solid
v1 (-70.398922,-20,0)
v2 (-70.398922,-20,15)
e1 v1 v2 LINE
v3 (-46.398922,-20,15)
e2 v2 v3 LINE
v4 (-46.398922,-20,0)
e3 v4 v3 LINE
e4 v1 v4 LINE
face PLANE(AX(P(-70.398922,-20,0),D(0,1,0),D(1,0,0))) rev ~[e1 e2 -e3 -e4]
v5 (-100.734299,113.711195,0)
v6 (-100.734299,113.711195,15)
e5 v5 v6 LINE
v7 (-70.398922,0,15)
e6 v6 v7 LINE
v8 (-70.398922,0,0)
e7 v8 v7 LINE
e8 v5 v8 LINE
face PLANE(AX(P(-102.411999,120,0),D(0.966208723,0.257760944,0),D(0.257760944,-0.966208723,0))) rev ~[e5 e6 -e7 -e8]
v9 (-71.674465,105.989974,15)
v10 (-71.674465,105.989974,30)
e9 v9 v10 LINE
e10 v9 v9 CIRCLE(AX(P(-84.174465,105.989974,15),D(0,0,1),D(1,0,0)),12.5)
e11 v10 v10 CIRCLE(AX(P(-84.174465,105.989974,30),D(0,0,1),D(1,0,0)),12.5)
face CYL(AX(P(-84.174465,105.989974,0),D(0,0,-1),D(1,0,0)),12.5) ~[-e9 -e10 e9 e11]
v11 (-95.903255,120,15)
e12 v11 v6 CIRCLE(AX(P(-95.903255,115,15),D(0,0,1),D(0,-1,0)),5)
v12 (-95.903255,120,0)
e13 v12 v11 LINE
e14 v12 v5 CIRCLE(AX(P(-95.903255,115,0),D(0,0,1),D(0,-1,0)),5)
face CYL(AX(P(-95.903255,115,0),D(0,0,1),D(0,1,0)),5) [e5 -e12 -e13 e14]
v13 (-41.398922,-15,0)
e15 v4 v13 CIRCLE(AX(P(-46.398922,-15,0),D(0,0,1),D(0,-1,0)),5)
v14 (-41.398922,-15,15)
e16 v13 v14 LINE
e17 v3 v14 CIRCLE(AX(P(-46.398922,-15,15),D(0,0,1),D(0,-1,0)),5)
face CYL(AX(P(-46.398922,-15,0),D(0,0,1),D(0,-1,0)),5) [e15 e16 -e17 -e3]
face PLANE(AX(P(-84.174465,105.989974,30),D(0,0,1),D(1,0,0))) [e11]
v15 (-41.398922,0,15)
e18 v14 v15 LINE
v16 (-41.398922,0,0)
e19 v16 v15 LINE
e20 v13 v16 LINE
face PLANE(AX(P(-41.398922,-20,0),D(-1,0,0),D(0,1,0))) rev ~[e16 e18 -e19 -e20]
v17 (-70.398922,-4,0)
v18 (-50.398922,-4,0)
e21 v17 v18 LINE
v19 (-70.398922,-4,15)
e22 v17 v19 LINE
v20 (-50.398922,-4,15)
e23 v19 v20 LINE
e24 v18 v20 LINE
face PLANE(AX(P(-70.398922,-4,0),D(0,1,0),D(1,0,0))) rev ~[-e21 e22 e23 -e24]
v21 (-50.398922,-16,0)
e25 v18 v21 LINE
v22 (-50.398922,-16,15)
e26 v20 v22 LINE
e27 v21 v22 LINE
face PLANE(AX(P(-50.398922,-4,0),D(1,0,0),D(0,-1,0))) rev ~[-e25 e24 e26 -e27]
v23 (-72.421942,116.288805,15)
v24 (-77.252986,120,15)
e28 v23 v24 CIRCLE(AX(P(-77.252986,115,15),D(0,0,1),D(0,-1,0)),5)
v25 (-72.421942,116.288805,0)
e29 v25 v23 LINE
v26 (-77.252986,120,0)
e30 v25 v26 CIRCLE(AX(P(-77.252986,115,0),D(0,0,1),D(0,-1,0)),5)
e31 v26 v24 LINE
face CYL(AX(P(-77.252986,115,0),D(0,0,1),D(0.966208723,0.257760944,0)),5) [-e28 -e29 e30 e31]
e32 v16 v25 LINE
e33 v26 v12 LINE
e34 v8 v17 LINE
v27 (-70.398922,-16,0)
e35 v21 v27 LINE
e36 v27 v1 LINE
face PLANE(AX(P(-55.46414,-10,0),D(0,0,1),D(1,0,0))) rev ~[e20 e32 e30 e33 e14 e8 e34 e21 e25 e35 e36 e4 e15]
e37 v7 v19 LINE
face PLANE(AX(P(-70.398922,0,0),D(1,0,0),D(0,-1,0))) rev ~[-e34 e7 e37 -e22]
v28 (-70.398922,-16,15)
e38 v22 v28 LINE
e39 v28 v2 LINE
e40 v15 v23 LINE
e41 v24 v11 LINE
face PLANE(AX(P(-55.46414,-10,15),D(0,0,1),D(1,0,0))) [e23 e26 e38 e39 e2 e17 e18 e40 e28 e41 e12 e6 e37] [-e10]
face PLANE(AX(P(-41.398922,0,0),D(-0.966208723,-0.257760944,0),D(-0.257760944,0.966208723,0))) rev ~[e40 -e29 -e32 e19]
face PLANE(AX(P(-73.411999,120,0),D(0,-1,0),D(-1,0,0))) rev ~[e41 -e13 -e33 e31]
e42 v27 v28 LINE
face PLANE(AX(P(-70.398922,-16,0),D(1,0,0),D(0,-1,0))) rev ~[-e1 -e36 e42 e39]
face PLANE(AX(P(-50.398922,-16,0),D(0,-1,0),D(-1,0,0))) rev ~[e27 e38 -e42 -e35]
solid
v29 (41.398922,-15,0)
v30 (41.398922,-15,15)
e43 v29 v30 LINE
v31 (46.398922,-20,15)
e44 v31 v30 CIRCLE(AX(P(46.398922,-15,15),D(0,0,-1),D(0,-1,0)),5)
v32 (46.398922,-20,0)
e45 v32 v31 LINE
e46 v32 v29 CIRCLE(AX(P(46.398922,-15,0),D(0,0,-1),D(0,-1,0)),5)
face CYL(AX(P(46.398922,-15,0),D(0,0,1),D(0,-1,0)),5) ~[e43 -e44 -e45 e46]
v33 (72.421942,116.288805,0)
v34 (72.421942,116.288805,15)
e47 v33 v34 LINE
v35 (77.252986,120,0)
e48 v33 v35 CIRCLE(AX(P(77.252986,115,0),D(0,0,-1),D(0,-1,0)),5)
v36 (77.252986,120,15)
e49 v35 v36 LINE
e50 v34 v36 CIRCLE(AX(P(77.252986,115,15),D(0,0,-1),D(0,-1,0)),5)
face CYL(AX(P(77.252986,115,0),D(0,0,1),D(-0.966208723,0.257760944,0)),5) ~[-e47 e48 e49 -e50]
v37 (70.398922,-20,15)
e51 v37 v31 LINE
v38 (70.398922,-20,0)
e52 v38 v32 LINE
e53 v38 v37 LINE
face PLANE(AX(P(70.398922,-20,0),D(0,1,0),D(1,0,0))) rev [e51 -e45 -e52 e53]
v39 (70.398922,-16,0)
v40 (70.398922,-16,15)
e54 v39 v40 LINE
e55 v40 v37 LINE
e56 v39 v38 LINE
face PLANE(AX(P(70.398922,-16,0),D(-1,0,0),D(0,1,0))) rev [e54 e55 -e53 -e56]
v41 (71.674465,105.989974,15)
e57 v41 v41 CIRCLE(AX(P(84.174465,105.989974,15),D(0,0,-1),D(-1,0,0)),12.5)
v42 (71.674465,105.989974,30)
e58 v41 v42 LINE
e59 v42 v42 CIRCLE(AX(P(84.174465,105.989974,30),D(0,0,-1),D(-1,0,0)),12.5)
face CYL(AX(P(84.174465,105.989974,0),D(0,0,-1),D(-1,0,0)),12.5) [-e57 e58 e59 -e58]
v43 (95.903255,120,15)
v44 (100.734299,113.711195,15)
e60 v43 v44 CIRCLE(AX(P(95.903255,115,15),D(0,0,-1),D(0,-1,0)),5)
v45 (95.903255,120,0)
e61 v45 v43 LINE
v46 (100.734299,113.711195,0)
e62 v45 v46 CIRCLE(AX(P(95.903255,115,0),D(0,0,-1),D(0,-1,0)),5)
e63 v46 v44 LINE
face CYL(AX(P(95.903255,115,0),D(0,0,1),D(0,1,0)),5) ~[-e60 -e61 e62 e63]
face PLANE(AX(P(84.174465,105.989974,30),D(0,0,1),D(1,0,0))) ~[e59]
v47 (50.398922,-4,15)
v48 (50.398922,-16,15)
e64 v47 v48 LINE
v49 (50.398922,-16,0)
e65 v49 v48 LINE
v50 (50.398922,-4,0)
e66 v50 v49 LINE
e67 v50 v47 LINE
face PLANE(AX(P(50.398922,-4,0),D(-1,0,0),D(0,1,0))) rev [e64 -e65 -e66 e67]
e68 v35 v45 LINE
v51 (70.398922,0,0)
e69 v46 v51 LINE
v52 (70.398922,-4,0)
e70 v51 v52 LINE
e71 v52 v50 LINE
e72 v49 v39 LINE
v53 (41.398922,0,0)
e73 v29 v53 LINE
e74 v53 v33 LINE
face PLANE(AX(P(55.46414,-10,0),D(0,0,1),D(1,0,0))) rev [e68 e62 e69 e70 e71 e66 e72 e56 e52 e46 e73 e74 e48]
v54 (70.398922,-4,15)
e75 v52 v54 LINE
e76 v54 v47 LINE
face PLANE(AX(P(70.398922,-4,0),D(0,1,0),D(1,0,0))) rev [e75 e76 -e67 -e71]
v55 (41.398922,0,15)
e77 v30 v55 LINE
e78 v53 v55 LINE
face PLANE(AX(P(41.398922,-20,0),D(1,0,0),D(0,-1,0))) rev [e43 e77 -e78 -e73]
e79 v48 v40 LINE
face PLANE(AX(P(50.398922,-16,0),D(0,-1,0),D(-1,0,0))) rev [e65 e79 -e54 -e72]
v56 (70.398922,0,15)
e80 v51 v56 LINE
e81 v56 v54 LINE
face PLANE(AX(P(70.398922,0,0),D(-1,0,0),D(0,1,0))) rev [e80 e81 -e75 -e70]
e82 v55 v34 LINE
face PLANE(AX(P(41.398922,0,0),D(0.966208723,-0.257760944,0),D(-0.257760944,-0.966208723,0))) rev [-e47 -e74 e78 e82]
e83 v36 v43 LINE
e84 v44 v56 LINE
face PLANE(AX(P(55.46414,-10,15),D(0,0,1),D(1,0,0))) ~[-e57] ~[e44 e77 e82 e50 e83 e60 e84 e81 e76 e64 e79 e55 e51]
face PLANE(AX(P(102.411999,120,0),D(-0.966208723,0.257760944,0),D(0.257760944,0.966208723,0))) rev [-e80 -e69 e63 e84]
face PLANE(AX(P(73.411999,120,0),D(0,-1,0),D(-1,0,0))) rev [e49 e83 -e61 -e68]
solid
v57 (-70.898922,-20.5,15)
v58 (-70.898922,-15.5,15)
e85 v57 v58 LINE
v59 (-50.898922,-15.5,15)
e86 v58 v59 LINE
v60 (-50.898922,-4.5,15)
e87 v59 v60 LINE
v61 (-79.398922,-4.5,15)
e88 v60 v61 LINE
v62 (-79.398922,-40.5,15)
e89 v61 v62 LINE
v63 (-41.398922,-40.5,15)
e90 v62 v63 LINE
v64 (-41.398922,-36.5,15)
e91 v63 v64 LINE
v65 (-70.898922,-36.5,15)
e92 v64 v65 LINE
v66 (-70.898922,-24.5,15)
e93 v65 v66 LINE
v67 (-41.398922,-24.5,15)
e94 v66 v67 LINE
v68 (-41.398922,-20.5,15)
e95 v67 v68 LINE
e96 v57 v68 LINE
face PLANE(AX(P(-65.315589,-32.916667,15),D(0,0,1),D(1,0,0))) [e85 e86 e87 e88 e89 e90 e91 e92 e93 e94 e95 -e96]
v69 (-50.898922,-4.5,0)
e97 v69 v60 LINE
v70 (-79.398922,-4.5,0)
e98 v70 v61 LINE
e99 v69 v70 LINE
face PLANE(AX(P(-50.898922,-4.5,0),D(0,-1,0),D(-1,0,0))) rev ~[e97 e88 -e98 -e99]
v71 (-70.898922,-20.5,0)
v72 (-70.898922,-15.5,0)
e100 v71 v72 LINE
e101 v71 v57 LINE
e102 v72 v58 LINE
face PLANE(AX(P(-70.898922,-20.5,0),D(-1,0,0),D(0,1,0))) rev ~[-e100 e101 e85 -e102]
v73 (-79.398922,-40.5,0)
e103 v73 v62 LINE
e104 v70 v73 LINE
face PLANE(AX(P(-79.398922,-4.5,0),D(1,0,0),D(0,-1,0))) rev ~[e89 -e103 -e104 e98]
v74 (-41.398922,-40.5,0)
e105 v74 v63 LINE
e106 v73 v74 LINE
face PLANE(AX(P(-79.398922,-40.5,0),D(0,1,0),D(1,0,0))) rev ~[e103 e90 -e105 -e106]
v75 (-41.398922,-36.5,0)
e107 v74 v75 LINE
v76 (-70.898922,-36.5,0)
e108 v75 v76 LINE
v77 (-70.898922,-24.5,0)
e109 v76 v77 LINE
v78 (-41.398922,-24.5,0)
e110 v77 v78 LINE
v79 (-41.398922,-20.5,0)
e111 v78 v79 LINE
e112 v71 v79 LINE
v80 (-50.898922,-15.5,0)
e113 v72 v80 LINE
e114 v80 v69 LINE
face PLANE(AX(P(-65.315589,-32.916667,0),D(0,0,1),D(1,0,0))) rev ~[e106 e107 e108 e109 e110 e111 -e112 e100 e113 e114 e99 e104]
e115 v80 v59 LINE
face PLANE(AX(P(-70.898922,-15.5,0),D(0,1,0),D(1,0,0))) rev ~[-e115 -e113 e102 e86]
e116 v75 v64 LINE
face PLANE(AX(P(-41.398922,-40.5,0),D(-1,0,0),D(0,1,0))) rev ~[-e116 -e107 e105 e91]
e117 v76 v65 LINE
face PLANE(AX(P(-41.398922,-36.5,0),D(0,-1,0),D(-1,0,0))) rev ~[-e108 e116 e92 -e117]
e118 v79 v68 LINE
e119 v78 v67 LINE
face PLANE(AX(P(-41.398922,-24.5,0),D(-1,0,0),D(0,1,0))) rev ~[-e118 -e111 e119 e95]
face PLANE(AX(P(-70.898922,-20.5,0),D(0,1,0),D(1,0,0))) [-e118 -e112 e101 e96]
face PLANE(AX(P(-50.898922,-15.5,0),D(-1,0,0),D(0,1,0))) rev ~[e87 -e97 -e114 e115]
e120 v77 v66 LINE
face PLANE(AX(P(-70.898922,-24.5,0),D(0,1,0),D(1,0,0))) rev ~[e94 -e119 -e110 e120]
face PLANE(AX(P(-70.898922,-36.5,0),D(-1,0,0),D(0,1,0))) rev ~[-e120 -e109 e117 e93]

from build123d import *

# Parameters (mm, degrees)
F0_R     = 12.5
F1_DEPTH = 15
F2_DEPTH = 30
F3_R     = 5
F0_W     = 29.5
F0_H     = 4
F5_DEPTH = 15


# Not quite as in the source:
# - a feature names something its author has since deleted; it is built from what else it names


with BuildPart() as f1:
    # F0 (on Top) → F1 (new body)
    with BuildSketch(Plane.XY):
        Polygon((-70.3989224725, -16), (-70.3989224725, -20), (-41.3989224725, -20), (-41.3989224725, 0), (-70.3989224725, 0), (-70.3989224725, -4), (-50.3989224725, -4), (-50.3989224725, -16), align=None)
        Polygon((-70.3989224725, 0), (-41.3989224725, 0), (-73.4119985036, 120), (-102.4119985036, 120), align=None)
        with Locations((-84.1744648133, 105.989973522)):
            Circle(F0_R, mode=Mode.SUBTRACT)
    extrude(amount=F1_DEPTH)

    # F0 (on Top) → F2 (join)
    with BuildSketch(Plane.XY):
        with Locations((-84.1744648133, 105.989973522)):
            Circle(F0_R)
    extrude(amount=F2_DEPTH)

    # F3
    f3_edges = [f1.edges().sort_by_distance(p)[0] for p in [
        (-41.398922, -20, 7.5),
        (-73.411999, 120, 7.5),
        (-102.411999, 120, 7.5),
    ]]
    fillet(f3_edges, radius=F3_R)


with BuildPart() as f4_1:
    # F4: instance of F1
    add(f1.part.mirror(Plane.YZ))


with BuildPart() as f5:
    # F0 (on Top) → F5 (new body)
    with BuildSketch(Plane.XY):
        Polygon((-70.8989224725, -15.5), (-79.3989224725, -15.5), (-79.3989224725, -40.5), (-41.3989224725, -40.5), (-41.3989224725, -36.5), (-70.8989224725, -36.5), (-70.8989224725, -24.5), (-70.8989224725, -20.5), align=None)
        Polygon((-50.8989224725, -15.5), (-50.8989224725, -4.5), (-79.3989224725, -4.5), (-79.3989224725, -15.5), (-70.8989224725, -15.5), align=None)
        with Locations((-56.1489224725, -22.5)):
            Rectangle(F0_W, F0_H)
    extrude(amount=F5_DEPTH)


solid = Compound([f1.part, f4_1.part, f5.part])
